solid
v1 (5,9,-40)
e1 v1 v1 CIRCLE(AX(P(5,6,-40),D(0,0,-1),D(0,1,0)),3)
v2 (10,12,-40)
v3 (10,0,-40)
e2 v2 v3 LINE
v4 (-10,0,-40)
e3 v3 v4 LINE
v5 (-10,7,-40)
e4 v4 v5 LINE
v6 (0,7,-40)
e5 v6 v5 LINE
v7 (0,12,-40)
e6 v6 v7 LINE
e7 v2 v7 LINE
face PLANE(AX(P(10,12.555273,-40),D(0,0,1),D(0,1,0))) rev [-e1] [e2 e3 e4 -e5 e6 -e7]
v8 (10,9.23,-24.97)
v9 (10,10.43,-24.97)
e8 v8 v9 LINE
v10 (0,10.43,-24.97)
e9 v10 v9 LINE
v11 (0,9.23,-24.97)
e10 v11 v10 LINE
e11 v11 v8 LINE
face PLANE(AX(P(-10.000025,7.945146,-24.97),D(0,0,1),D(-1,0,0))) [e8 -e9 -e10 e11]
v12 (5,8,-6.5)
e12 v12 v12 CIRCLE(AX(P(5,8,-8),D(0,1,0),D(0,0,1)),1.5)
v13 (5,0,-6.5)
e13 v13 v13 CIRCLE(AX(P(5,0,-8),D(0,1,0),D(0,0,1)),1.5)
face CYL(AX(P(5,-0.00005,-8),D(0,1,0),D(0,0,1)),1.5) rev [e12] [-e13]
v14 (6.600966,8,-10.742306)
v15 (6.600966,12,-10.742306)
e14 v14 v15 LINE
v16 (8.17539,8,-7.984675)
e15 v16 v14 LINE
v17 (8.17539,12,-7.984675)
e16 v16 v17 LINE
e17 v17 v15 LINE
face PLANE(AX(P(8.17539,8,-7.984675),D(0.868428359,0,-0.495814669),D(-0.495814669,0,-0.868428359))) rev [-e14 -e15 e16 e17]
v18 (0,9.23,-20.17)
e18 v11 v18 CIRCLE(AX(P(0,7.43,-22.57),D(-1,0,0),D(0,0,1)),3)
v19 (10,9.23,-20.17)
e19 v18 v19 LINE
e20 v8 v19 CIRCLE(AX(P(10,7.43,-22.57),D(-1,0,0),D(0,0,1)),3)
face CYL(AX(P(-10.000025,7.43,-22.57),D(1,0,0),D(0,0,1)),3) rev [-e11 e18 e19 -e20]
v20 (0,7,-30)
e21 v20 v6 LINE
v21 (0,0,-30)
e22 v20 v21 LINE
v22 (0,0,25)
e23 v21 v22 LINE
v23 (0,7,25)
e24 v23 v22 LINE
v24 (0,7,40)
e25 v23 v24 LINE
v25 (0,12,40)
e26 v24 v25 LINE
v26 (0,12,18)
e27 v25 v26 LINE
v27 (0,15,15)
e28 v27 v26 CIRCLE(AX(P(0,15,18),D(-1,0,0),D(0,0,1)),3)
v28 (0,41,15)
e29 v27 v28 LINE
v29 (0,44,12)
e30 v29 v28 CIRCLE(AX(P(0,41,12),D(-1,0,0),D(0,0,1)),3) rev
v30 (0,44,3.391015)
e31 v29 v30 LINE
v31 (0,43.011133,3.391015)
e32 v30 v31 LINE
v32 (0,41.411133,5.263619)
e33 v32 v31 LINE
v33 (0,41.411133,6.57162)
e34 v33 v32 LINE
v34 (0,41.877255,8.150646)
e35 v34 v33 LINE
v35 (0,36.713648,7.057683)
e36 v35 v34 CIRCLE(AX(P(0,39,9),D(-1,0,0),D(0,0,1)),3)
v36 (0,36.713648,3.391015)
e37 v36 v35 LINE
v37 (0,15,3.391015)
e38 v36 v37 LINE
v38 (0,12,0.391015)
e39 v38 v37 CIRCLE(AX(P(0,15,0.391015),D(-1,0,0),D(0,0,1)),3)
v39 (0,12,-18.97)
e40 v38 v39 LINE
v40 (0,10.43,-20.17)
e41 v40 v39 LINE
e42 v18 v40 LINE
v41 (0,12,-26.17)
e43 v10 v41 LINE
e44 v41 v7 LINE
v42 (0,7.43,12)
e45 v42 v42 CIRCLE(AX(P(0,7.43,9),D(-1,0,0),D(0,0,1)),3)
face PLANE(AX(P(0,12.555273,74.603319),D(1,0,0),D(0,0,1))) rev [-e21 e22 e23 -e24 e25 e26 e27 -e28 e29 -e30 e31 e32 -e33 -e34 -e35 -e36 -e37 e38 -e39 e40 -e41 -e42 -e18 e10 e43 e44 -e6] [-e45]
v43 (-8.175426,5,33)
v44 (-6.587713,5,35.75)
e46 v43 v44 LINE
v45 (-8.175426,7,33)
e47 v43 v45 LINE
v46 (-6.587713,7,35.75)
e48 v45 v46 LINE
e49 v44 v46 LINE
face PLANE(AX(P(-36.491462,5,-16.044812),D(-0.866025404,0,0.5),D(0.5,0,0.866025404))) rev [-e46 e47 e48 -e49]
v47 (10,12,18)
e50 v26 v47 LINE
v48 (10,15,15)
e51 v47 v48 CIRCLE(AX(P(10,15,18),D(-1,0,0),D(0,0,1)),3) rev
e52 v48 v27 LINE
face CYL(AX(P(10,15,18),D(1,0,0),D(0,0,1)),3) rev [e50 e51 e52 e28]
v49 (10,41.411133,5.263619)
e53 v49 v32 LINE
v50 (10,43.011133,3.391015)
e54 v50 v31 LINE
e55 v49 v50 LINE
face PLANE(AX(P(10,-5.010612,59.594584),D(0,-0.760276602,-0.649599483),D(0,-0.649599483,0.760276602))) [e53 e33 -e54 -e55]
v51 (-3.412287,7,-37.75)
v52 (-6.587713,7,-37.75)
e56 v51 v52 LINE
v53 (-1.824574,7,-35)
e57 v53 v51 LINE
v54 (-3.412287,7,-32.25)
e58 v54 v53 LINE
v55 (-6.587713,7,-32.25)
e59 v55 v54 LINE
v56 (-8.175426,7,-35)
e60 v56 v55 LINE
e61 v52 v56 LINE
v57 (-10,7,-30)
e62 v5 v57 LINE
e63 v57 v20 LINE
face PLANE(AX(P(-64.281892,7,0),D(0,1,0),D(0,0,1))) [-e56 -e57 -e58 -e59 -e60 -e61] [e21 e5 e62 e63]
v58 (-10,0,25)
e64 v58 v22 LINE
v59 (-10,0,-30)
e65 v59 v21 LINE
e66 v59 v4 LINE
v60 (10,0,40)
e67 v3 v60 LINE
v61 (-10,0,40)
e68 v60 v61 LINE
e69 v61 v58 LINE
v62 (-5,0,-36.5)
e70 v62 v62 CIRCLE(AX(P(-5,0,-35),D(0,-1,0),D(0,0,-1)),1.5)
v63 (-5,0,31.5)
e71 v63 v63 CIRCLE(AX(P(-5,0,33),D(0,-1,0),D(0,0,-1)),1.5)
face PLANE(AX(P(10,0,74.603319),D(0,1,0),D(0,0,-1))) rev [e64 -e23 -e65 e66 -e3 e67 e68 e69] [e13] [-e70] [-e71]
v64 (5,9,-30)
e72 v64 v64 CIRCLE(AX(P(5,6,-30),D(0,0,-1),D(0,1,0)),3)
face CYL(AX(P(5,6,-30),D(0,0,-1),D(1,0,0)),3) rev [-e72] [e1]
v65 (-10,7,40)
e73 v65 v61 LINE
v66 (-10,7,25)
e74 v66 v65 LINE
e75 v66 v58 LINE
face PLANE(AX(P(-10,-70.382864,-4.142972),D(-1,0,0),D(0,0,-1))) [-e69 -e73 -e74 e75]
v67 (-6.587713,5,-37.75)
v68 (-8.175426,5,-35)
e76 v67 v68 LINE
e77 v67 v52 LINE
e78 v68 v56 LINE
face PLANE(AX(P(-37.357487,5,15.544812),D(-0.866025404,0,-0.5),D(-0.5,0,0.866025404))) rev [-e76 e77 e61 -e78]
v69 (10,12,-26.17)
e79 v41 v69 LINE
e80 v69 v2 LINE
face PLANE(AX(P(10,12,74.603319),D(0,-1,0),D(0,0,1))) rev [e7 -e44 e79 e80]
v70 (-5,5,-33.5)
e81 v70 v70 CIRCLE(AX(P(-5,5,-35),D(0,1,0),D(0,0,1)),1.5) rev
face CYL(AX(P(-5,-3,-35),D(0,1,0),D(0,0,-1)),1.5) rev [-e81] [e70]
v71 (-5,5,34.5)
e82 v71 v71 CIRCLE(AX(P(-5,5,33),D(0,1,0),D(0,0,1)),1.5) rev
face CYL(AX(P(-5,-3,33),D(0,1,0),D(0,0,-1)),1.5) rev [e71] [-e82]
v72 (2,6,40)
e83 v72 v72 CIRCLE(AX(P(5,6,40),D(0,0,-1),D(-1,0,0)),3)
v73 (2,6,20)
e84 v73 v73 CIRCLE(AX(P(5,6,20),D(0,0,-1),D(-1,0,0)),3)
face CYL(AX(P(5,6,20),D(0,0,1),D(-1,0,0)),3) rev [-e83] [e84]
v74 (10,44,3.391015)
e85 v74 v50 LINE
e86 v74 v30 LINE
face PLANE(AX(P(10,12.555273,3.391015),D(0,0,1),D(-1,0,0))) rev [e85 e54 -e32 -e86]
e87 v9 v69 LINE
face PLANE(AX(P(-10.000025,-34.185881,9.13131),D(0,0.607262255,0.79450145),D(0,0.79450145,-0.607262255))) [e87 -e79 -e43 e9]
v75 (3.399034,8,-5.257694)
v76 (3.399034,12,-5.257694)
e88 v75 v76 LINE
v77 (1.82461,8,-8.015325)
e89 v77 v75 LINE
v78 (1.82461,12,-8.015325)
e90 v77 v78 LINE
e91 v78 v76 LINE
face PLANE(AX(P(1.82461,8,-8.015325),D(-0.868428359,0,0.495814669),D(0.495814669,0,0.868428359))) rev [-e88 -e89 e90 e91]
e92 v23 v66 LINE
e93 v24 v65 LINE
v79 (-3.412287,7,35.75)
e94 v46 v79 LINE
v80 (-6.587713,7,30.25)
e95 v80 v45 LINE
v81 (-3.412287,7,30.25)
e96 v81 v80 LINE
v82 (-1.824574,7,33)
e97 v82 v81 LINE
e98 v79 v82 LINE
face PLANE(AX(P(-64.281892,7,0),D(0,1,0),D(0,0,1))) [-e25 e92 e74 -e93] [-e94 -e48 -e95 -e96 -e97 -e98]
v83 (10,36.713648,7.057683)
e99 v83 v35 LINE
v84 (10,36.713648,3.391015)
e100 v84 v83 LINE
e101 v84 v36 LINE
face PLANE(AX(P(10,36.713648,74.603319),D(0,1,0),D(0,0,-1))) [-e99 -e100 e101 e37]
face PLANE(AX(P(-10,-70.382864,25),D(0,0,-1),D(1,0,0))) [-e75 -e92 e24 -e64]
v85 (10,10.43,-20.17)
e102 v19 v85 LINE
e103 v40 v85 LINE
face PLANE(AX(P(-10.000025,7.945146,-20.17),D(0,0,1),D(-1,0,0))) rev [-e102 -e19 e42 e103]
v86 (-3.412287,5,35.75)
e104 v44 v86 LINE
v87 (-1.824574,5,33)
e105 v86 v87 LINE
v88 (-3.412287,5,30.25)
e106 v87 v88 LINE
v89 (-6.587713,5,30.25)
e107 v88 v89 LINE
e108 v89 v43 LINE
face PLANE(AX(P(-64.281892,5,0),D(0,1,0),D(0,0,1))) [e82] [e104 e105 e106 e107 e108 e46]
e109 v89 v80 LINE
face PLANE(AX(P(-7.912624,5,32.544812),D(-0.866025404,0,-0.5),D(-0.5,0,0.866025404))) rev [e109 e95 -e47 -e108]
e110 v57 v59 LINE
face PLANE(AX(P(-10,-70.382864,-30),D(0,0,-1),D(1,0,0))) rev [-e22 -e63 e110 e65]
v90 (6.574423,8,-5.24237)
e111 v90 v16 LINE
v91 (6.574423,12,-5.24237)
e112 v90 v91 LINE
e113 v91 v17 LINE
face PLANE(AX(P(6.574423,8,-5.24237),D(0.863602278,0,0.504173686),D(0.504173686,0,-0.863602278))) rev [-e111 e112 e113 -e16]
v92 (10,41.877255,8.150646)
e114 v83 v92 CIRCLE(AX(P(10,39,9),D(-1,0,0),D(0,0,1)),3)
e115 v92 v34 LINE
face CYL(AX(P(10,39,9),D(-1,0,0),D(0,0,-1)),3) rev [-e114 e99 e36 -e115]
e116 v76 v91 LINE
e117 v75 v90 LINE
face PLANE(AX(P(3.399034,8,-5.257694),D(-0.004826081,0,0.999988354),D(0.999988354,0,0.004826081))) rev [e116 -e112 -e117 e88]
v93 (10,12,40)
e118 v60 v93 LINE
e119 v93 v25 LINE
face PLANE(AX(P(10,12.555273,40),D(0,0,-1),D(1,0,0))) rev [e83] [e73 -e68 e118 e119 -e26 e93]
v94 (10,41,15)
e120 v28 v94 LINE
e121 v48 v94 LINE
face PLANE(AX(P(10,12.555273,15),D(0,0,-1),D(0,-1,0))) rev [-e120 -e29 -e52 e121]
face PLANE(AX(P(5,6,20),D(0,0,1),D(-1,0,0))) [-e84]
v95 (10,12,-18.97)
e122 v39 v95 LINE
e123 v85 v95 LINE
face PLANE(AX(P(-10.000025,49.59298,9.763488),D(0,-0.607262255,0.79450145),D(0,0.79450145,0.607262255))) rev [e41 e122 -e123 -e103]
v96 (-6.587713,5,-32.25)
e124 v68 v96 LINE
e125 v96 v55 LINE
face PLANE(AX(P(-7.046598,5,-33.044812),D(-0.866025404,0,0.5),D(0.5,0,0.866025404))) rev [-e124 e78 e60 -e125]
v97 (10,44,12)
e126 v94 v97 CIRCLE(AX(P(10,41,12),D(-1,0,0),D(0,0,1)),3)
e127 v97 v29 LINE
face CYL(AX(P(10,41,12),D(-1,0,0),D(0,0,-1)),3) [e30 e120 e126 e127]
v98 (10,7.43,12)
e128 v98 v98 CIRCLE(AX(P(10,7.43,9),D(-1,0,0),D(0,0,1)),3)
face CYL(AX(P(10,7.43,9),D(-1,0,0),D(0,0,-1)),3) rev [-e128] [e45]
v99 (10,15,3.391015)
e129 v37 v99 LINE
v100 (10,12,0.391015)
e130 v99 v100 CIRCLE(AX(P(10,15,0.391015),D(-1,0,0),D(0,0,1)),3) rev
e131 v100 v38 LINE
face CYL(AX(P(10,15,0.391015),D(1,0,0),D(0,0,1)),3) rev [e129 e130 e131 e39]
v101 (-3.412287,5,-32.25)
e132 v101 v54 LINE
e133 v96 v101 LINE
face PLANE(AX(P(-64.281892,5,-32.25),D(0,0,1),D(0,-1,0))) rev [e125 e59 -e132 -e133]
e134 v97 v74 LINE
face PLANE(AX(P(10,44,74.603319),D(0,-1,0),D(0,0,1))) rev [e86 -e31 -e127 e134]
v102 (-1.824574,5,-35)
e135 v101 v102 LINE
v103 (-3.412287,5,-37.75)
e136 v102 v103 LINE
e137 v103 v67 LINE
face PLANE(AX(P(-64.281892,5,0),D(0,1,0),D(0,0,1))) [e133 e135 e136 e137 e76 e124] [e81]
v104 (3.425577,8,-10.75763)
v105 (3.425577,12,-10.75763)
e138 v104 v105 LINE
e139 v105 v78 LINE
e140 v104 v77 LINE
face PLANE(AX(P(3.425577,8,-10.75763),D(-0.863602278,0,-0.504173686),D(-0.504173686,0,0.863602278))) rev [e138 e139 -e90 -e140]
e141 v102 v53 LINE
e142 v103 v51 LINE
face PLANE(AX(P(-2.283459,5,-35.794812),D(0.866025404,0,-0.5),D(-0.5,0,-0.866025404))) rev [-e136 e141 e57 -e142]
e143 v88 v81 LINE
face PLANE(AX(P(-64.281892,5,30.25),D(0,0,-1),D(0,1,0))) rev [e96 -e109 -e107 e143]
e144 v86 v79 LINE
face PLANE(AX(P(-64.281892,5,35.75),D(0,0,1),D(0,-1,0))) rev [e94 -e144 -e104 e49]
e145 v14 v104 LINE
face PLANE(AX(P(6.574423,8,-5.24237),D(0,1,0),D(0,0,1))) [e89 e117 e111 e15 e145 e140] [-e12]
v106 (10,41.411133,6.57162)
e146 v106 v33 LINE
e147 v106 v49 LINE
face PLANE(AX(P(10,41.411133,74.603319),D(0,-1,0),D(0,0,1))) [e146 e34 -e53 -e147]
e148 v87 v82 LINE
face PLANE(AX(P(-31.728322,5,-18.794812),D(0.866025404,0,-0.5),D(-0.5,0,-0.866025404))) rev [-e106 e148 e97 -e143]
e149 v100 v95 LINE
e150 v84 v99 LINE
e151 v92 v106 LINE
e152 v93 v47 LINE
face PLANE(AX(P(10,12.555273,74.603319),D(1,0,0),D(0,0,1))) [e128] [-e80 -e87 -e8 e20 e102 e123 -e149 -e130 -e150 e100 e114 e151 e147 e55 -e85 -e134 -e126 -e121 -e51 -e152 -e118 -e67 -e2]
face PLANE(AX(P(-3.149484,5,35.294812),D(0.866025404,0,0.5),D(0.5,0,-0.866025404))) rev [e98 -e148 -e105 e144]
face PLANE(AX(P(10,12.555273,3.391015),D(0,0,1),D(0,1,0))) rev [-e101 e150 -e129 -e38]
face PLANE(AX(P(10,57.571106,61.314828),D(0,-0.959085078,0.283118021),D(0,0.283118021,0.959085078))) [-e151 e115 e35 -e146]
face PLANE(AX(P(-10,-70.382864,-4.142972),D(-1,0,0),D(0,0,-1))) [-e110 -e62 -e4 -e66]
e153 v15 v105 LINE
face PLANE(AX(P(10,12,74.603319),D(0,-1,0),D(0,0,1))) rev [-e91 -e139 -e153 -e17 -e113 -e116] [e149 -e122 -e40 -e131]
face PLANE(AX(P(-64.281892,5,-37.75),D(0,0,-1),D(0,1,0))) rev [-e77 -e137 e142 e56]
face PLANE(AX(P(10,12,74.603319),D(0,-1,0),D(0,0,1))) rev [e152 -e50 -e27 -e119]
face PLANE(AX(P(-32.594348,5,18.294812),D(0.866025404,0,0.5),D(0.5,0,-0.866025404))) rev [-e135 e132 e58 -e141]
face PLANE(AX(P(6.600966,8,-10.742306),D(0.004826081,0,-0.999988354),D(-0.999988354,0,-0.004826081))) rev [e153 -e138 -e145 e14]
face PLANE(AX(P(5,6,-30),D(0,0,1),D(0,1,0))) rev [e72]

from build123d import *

# Parameters (mm, degrees)
ESBO_O1_R                          = 3
RESSALTO_EXTRUS_O1_DEPTH           = 10
ESBO_O2_R                          = 3
CORTE_EXTRUS_O1_DEPTH              = 20
CORTE_EXTRUS_O2_START              = -70
ESBO_O2_2_R                        = 3
CORTE_EXTRUS_O2_DEPTH              = 10
FILETE1_R                          = 3
ESBO_O3_W                          = 15
ESBO_O3_H                          = 12
ESBO_O3_W_2                        = 10
RESSALTO_EXTRUS_O2_DEPTH           = 10
ESBO_O4_R                          = 1.5
CORTE_EXTRUS_O3_DEPTH              = 15
PADR_O_LINEAR1_COUNT               = 2
PADR_O_LINEAR1_PITCH               = 68
ESBO_O5_R                          = 3
CORTE_EXTRUS_O4_DEPTH              = 63.737548565
CORPO_MOVER_COPIAR1_OUTLINE_R      = 3
CORPO_MOVER_COPIAR1_DEPTH          = 10
CORPO_MOVER_COPIAR1_START          = -10
CORPO_MOVER_COPIAR1_2_OUTLINE_W    = 12
CORPO_MOVER_COPIAR1_2_OUTLINE_H    = 5
CORPO_MOVER_COPIAR1_2_DEPTH        = 11.9999999
CORPO_MOVER_COPIAR1_START_2        = 7.999555429
CORPO_MOVER_COPIAR1_3_DEPTH        = 2.000444571
CORPO_MOVER_COPIAR1_4_DEPTH        = 1.9999999
CORPO_MOVER_COPIAR1_START_3        = -15
CORPO_MOVER_COPIAR1_5_OUTLINE_W    = 10
CORPO_MOVER_COPIAR1_5_OUTLINE_H    = 12
CORPO_MOVER_COPIAR1_5_DEPTH        = 11.608984939
CORPO_MOVER_COPIAR1_START_4        = 15
CORPO_MOVER_COPIAR1_6_OUTLINE_W    = 10
CORPO_MOVER_COPIAR1_6_OUTLINE_H    = 12
CORPO_MOVER_COPIAR1_6_OUTLINE_R    = 3
CORPO_MOVER_COPIAR1_6_DEPTH        = 11.17
CORPO_MOVER_COPIAR1_START_5        = 25
CORPO_MOVER_COPIAR1_7_OUTLINE_W    = 10
CORPO_MOVER_COPIAR1_7_OUTLINE_H    = 12
CORPO_MOVER_COPIAR1_7_DEPTH        = 5
CORPO_MOVER_COPIAR1_START_6        = -30
CORPO_MOVER_COPIAR1_8_OUTLINE_R    = 3
CORPO_MOVER_COPIAR1_8_DEPTH        = 3.5411
CORPO_MOVER_COPIAR1_START_7        = 19.57
CORPO_MOVER_COPIAR1_9_OUTLINE_R    = 3
CORPO_MOVER_COPIAR1_9_DEPTH        = 0.43
CORPO_MOVER_COPIAR1_10_OUTLINE_W   = 10
CORPO_MOVER_COPIAR1_10_OUTLINE_H   = 5
CORPO_MOVER_COPIAR1_10_DEPTH       = 12
CORPO_MOVER_COPIAR1_11_OUTLINE_R   = 3
CORPO_MOVER_COPIAR1_11_DEPTH       = 20
CORPO_MOVER_COPIAR1_12_DEPTH       = 10
CORPO_MOVER_COPIAR1_13_OUTLINE_W   = 10
CORPO_MOVER_COPIAR1_13_OUTLINE_H   = 12
CORPO_MOVER_COPIAR1_13_OUTLINE_H_2 = 32
CORPO_MOVER_COPIAR1_13_DEPTH       = 26.608984939
CORPO_MOVER_COPIAR1_START_8        = 20
CORPO_MOVER_COPIAR1_14_OUTLINE_R   = 3
CORPO_MOVER_COPIAR1_14_DEPTH       = 10
CORPO_MOVER_COPIAR1_15_OUTLINE_W   = 10
CORPO_MOVER_COPIAR1_15_OUTLINE_H   = 5
CORPO_MOVER_COPIAR1_15_DEPTH       = 12
CORTE_EXTRUS_O5_START              = -5
ESBO_O6_W                          = 10
ESBO_O6_H                          = 15
ESBO_O6_H_2                        = 10
ESBO_O6_R                          = 1.5
CORTE_EXTRUS_O5_DEPTH              = 5
CORTE_EXTRUS_O6_START              = -7
ESBO_O6_3_R                        = 1.5
CORTE_EXTRUS_O6_DEPTH              = 7
ESBO_O7_R                          = 1.5
CORTE_EXTRUS_O7_DEPTH              = 53.191953422
ESBO_O7_3_R                        = 1.5
CORTE_EXTRUS_O8_DEPTH              = 4


# Read off the part's stored shape, not the designer's step: Corpo-Mover/Copiar1
with BuildPart() as part:
    # Esboço1 → Ressalto-extrusão1 (new body)
    with BuildSketch(Plane(origin=(0, 0, 0), x_dir=(0, 0, -1), z_dir=(1, 0, 0))):
        with BuildLine():
            Line((15, 44), (3.391015061, 44))
            Line((3.391015061, 44), (3.391015061, 43.011133206))
            Line((3.391015061, 43.011133206), (5.263619021, 41.411133206))
            Line((5.263619021, 41.411133206), (6.571620064, 41.411133206))
            Line((6.571620064, 41.411133206), (8.150645936, 41.877255233))
            ThreePointArc((8.150645936, 41.877255233), (11.934972998, 38.378764538), (7.057683257, 36.713647956))
            Line((7.057683257, 36.713647956), (3.391015061, 36.713647956))
            Line((3.391015061, 36.713647956), (3.391015061, 12))
            Line((3.391015061, 12), (-40, 12))
            Line((-40, 12), (-40, 0))
            Line((-40, 0), (40, 0))
            Line((40, 0), (40, 12))
            Line((40, 12), (15, 12))
            Line((15, 12), (15, 44))
        make_face()
        with Locations((9, 7.43)):
            Circle(ESBO_O1_R, mode=Mode.SUBTRACT)
    extrude(amount=RESSALTO_EXTRUS_O1_DEPTH)

    # Esboço2 → Corte-extrusão1 (cut)
    with BuildSketch(Plane(origin=(0, 0, -40), x_dir=(-1, 0, 0), z_dir=(0, 0, -1))):
        with Locations((-5, 6)):
            Circle(ESBO_O2_R)
    extrude(amount=-CORTE_EXTRUS_O1_DEPTH, mode=Mode.SUBTRACT)

    # Esboço2<2> → Corte-extrusão2 (cut)
    with BuildSketch(Plane(origin=(0, 0, -40), x_dir=(-1, 0, 0), z_dir=(0, 0, -1)).offset(CORTE_EXTRUS_O2_START)):
        with Locations((-5, 6)):
            Circle(ESBO_O2_2_R)
    extrude(amount=-CORTE_EXTRUS_O2_DEPTH, mode=Mode.SUBTRACT)

    # Filete1
    filete1_edges = [part.edges().sort_by_distance(p)[0] for p in [
        (5, 12, -3.391015061),
        (5, 44, -15),
        (5, 12, -15),
    ]]
    fillet(filete1_edges, radius=FILETE1_R)

    # Esboço3 → Ressalto-extrusão2 (add)
    with BuildSketch(Plane.ZY):
        with Locations((-32.5, 6)):
            Rectangle(ESBO_O3_W, ESBO_O3_H)
        with Locations((35, 6)):
            Rectangle(ESBO_O3_W_2, ESBO_O3_H)
    extrude(amount=RESSALTO_EXTRUS_O2_DEPTH)

    # Esboço4 → Corte-extrusão3 (cut)
    with BuildSketch(Plane(origin=(0, 12, 0), x_dir=(1, 0, 0), z_dir=(0, 1, 0))):
        with Locations(Location((-5, 33, 0), (0, 0, 270))):
            Circle(ESBO_O4_R)
    corte_extrus_o3 = extrude(amount=-CORTE_EXTRUS_O3_DEPTH, mode=Mode.SUBTRACT)

    # Padrão linear1: Corte-extrusão3 ×2
    with Locations(*[(0, 0, i * PADR_O_LINEAR1_PITCH) for i in range(1, PADR_O_LINEAR1_COUNT)]):
        add(corte_extrus_o3, mode=Mode.SUBTRACT)

    # Esboço5 → Corte-extrusão4 (cut, through all)
    with BuildSketch(Plane(origin=(10, 0, 0), x_dir=(0, 0, -1), z_dir=(1, 0, 0))):
        with Locations((-22.57, 7.43)):
            Circle(ESBO_O5_R)
        with BuildLine():
            Line((-18.97, 12), (-26.17, 12))
            Line((-26.17, 12), (-24.97, 10.43))
            Line((-24.97, 10.43), (-24.97, 9.23))
            ThreePointArc((-24.97, 9.23), (-22.57, 10.43), (-20.17, 9.23))
            Line((-20.17, 9.23), (-20.17, 10.43))
            Line((-20.17, 10.43), (-18.97, 12))
        make_face()
    extrude(amount=-CORTE_EXTRUS_O4_DEPTH, mode=Mode.SUBTRACT)

    # Corpo-Mover/Copiar1 outline → Corpo-Mover/Copiar1 (add)
    # profile 1 of 2: a face of its own
    with BuildSketch(Plane.YZ):
        with BuildLine():
            ThreePointArc((15, 15), (12.878679656, 15.878679656), (12, 18))
            Line((12, 18), (12, 18.97))
            Line((12, 18.97), (10.43, 20.17))
            Line((10.43, 20.17), (9.23, 20.17))
            ThreePointArc((9.23, 20.17), (5.014914218, 20.790291972), (5.670710371, 25))
            Line((5.670710371, 25), (0, 25))
            Line((0, 25), (0, -30))
            Line((0, -30), (12, -30))
            Line((12, -30), (12, -26.17))
            Line((12, -26.17), (10.46925, -25))
            Line((10.46925, -25), (9.189289629, -25))
            ThreePointArc((9.189289629, -25), (4.927760612, -24.224931432), (5.882388938, -20))
            ThreePointArc((5.882388938, -20), (7.43, -19.57), (8.977611062, -20))
            ThreePointArc((8.977611062, -20), (9.105962397, -20.081797829), (9.23, -20.17))
            Line((9.23, -20.17), (10.43, -20.17))
            Line((10.43, -20.17), (12, -18.97))
            Line((12, -18.97), (12, 0.391015061))
            ThreePointArc((12, 0.391015061), (12.878679656, 2.512335405), (15, 3.391015061))
            Line((15, 3.391015061), (36.713647956, 3.391015061))
            Line((36.713647956, 3.391015061), (36.713647956, 7.057683257))
            ThreePointArc((36.713647956, 7.057683257), (38.378764539, 11.934972998), (41.877255233, 8.150645936))
            Line((41.877255233, 8.150645936), (41.411133206, 6.571620064))
            Line((41.411133206, 6.571620064), (41.411133206, 5.263619021))
            Line((41.411133206, 5.263619021), (43.011133206, 3.391015061))
            Line((43.011133206, 3.391015061), (44, 3.391015061))
            Line((44, 3.391015061), (44, 12))
            ThreePointArc((44, 12), (43.121320344, 14.121320344), (41, 15))
            Line((41, 15), (15, 15))
        make_face()
        with Locations((7.43, 9)):
            Circle(CORPO_MOVER_COPIAR1_OUTLINE_R, mode=Mode.SUBTRACT)
    # profile 2 of 2: a face of its own
    with BuildSketch(Plane.YZ):
        Polygon((10.46925, 25), (12, 25), (12, 26.17), align=None)
    extrude(amount=CORPO_MOVER_COPIAR1_DEPTH)

    # Corpo-Mover_Copiar1 2 outline → Corpo-Mover_Copiar1 2 (add)
    with BuildSketch(Plane.YZ.offset(CORPO_MOVER_COPIAR1_START)):
        with Locations((6, 27.5)):
            Rectangle(CORPO_MOVER_COPIAR1_2_OUTLINE_W, CORPO_MOVER_COPIAR1_2_OUTLINE_H)
    extrude(amount=CORPO_MOVER_COPIAR1_2_DEPTH)

    # Corpo-Mover_Copiar1 3 outline → Corpo-Mover_Copiar1 3 (add)
    with BuildSketch(Plane.YZ.offset(CORPO_MOVER_COPIAR1_START_2)):
        with BuildLine():
            Line((10.43, 20.17), (12, 18.97))
            Line((12, 18.97), (12, 25))
            Line((12, 25), (10.46925, 25))
            Line((10.46925, 25), (10.43, 24.97))
            Line((10.43, 24.97), (9.23, 24.97))
            ThreePointArc((9.23, 24.97), (4.43, 22.57), (9.23, 20.17))
            Line((9.23, 20.17), (10.43, 20.17))
        make_face()
    extrude(amount=CORPO_MOVER_COPIAR1_3_DEPTH)

    # Corpo-Mover_Copiar1 4 outline → Corpo-Mover_Copiar1 4 (add)
    with BuildSketch(Plane.YZ):
        with BuildLine():
            Line((10.43, 20.17), (12, 18.97))
            Line((12, 18.97), (12, 25))
            Line((12, 25), (10.46925, 25))
            Line((10.46925, 25), (10.43, 24.97))
            Line((10.43, 24.97), (9.23, 24.97))
            ThreePointArc((9.23, 24.97), (9.209708028, 24.985085782), (9.189289629, 25))
            Line((9.189289629, 25), (5.670710371, 25))
            ThreePointArc((5.670710371, 25), (5.014914218, 20.790291972), (9.23, 20.17))
            Line((9.23, 20.17), (10.43, 20.17))
        make_face()
    extrude(amount=CORPO_MOVER_COPIAR1_4_DEPTH)

    # Corpo-Mover_Copiar1 5 outline → Corpo-Mover_Copiar1 5 (add)
    with BuildSketch(Plane.XY.offset(CORPO_MOVER_COPIAR1_START_3)):
        with Locations((5, 6)):
            Rectangle(CORPO_MOVER_COPIAR1_5_OUTLINE_W, CORPO_MOVER_COPIAR1_5_OUTLINE_H)
    extrude(amount=CORPO_MOVER_COPIAR1_5_DEPTH)

    # Corpo-Mover_Copiar1 6 outline → Corpo-Mover_Copiar1 6 (add)
    with BuildSketch(Plane.XY.offset(CORPO_MOVER_COPIAR1_START_4)):
        with Locations((5, 6)):
            Rectangle(CORPO_MOVER_COPIAR1_6_OUTLINE_W, CORPO_MOVER_COPIAR1_6_OUTLINE_H)
        with Locations((5, 6)):
            Circle(CORPO_MOVER_COPIAR1_6_OUTLINE_R, mode=Mode.SUBTRACT)
    extrude(amount=CORPO_MOVER_COPIAR1_6_DEPTH)

    # Corpo-Mover_Copiar1 7 outline → Corpo-Mover_Copiar1 7 (add)
    with BuildSketch(Plane.XY.offset(CORPO_MOVER_COPIAR1_START_5)):
        with Locations((-5, 6)):
            Rectangle(CORPO_MOVER_COPIAR1_7_OUTLINE_W, CORPO_MOVER_COPIAR1_7_OUTLINE_H)
    extrude(amount=CORPO_MOVER_COPIAR1_7_DEPTH)

    # Corpo-Mover_Copiar1 8 outline → Corpo-Mover_Copiar1 8 (add)
    with BuildSketch(Plane.XY.offset(CORPO_MOVER_COPIAR1_START_6)):
        with Locations((5, 6)):
            Circle(CORPO_MOVER_COPIAR1_8_OUTLINE_R)
    extrude(amount=CORPO_MOVER_COPIAR1_8_DEPTH)

    # Corpo-Mover_Copiar1 9 outline → Corpo-Mover_Copiar1 9 (add)
    with BuildSketch(Plane.XY.offset(CORPO_MOVER_COPIAR1_START_7)):
        with Locations((5, 6)):
            Circle(CORPO_MOVER_COPIAR1_9_OUTLINE_R)
    extrude(amount=CORPO_MOVER_COPIAR1_9_DEPTH)

    # Corpo-Mover_Copiar1 10 outline → Corpo-Mover_Copiar1 10 (add)
    with BuildSketch(Plane(origin=(0, 0, 0), x_dir=(1, 0, 0), z_dir=(0, 1, 0))):
        with BuildLine():
            ThreePointArc((-3.881966011, -34), (-5, -34.5), (-6.118033989, -34))
            ThreePointArc((-6.118033989, -34), (-5, -36.5), (-3.881966011, -34))
        make_face()
        with BuildLine():
            ThreePointArc((-3.881966011, 34), (-5, 33.5), (-6.118033989, 34))
            ThreePointArc((-6.118033989, 34), (-5, 31.5), (-3.881966011, 34))
        make_face()
        with Locations((-5, -27.5)):
            Rectangle(CORPO_MOVER_COPIAR1_10_OUTLINE_W, CORPO_MOVER_COPIAR1_10_OUTLINE_H)
    extrude(amount=CORPO_MOVER_COPIAR1_10_DEPTH)

    # Corpo-Mover_Copiar1 11 outline → Corpo-Mover_Copiar1 11 (cut)
    with BuildSketch(Plane.YZ.offset(CORPO_MOVER_COPIAR1_START)):
        with BuildLine():
            ThreePointArc((15, -3.391015061), (12.878679656, -2.512335405), (12, -0.391015061))
            Line((12, -0.391015061), (12, -18))
            ThreePointArc((12, -18), (12.878679656, -15.878679656), (15, -15))
            Line((15, -15), (41, -15))
            ThreePointArc((41, -15), (43.121320344, -14.121320344), (44, -12))
            Line((44, -12), (44, -3.391015061))
            Line((44, -3.391015061), (43.011133206, -3.391015061))
            Line((43.011133206, -3.391015061), (41.411133206, -5.263619021))
            Line((41.411133206, -5.263619021), (41.411133206, -6.571620064))
            Line((41.411133206, -6.571620064), (41.877255233, -8.150645936))
            ThreePointArc((41.877255233, -8.150645936), (38.378764539, -11.934972998), (36.713647956, -7.057683257))
            Line((36.713647956, -7.057683257), (36.713647956, -3.391015061))
            Line((36.713647956, -3.391015061), (15, -3.391015061))
        make_face()
        with BuildLine():
            Line((12, -18.97), (10.43, -20.17))
            Line((10.43, -20.17), (9.23, -20.17))
            ThreePointArc((9.23, -20.17), (4.43, -22.57), (9.23, -24.97))
            Line((9.23, -24.97), (10.43, -24.97))
            Line((10.43, -24.97), (12, -26.17))
            Line((12, -26.17), (12, -18.97))
        make_face()
        with Locations((7.43, 9)):
            Circle(CORPO_MOVER_COPIAR1_11_OUTLINE_R)
    extrude(amount=CORPO_MOVER_COPIAR1_11_DEPTH, mode=Mode.SUBTRACT)

    # Corpo-Mover_Copiar1 12 outline → Corpo-Mover_Copiar1 12 (cut)
    with BuildSketch(Plane.YZ.offset(CORPO_MOVER_COPIAR1_START)):
        with BuildLine():
            Line((12, -30), (12, -26.17))
            Line((12, -26.17), (10.46925, -25))
            Line((10.46925, -25), (9.189289629, -25))
            ThreePointArc((9.189289629, -25), (7.43, -25.57), (5.670710371, -25))
            Line((5.670710371, -25), (0, -25))
            Line((0, -25), (0, -30))
            Line((0, -30), (12, -30))
        make_face()
    extrude(amount=CORPO_MOVER_COPIAR1_12_DEPTH, mode=Mode.SUBTRACT)

    # Corpo-Mover_Copiar1 13 outline → Corpo-Mover_Copiar1 13 (cut)
    with BuildSketch(Plane.XY.offset(CORPO_MOVER_COPIAR1_START_6)):
        with Locations((-5, 6)):
            Rectangle(CORPO_MOVER_COPIAR1_13_OUTLINE_W, CORPO_MOVER_COPIAR1_13_OUTLINE_H)
        with Locations((5, 28)):
            Rectangle(CORPO_MOVER_COPIAR1_13_OUTLINE_W, CORPO_MOVER_COPIAR1_13_OUTLINE_H_2)
    extrude(amount=CORPO_MOVER_COPIAR1_13_DEPTH, mode=Mode.SUBTRACT)

    # Corpo-Mover_Copiar1 14 outline → Corpo-Mover_Copiar1 14 (cut)
    with BuildSketch(Plane.XY.offset(CORPO_MOVER_COPIAR1_START_8)):
        with Locations((5, 6)):
            Circle(CORPO_MOVER_COPIAR1_14_OUTLINE_R)
    extrude(amount=CORPO_MOVER_COPIAR1_14_DEPTH, mode=Mode.SUBTRACT)

    # Corpo-Mover_Copiar1 15 outline → Corpo-Mover_Copiar1 15 (cut)
    with BuildSketch(Plane(origin=(0, 0, 0), x_dir=(1, 0, 0), z_dir=(0, 1, 0))):
        with BuildLine():
            ThreePointArc((-3.881966011, -34), (-5, -31.5), (-6.118033989, -34))
            ThreePointArc((-6.118033989, -34), (-5, -33.5), (-3.881966011, -34))
        make_face()
        with BuildLine():
            ThreePointArc((-3.881966011, 34), (-5, 36.5), (-6.118033989, 34))
            ThreePointArc((-6.118033989, 34), (-5, 34.5), (-3.881966011, 34))
        make_face()
        with Locations((-5, 27.5)):
            Rectangle(CORPO_MOVER_COPIAR1_15_OUTLINE_W, CORPO_MOVER_COPIAR1_15_OUTLINE_H)
    extrude(amount=CORPO_MOVER_COPIAR1_15_DEPTH, mode=Mode.SUBTRACT)

    # Esboço6 → Corte-extrusão5 (cut)
    # profile 1 of 4: a face of its own
    with BuildSketch(Plane(origin=(0, 12, 0), x_dir=(1, 0, 0), z_dir=(0, 1, 0)).offset(CORTE_EXTRUS_O5_START)):
        with Locations((-5, -32.5)):
            Rectangle(ESBO_O6_W, ESBO_O6_H)
        Polygon((-6.58771324, -35.75), (-3.41228676, -35.75), (-1.824573519, -33), (-3.41228676, -30.25), (-6.58771324, -30.25), (-8.175426481, -33), align=None, mode=Mode.SUBTRACT)
    # profile 2 of 4: a face of its own
    with BuildSketch(Plane(origin=(0, 12, 0), x_dir=(1, 0, 0), z_dir=(0, 1, 0)).offset(CORTE_EXTRUS_O5_START)):
        Polygon((-8.175426481, -33), (-6.58771324, -35.75), (-3.41228676, -35.75), (-1.824573519, -33), (-3.41228676, -30.25), (-6.58771324, -30.25), align=None)
    # profile 3 of 4: a face of its own
    with BuildSketch(Plane(origin=(0, 12, 0), x_dir=(1, 0, 0), z_dir=(0, 1, 0)).offset(CORTE_EXTRUS_O5_START)):
        with Locations((-5, 35)):
            Rectangle(ESBO_O6_W, ESBO_O6_H_2)
        Polygon((-1.824573519, 35), (-3.41228676, 32.25), (-6.58771324, 32.25), (-8.175426481, 35), (-6.58771324, 37.75), (-3.41228676, 37.75), align=None, mode=Mode.SUBTRACT)
    # profile 4 of 4: a face of its own
    with BuildSketch(Plane(origin=(0, 12, 0), x_dir=(1, 0, 0), z_dir=(0, 1, 0)).offset(CORTE_EXTRUS_O5_START)):
        Polygon((-8.175426481, 35), (-6.58771324, 32.25), (-3.41228676, 32.25), (-1.824573519, 35), (-3.41228676, 37.75), (-6.58771324, 37.75), align=None)
        with Locations(Location((-5, 35, 0), (0, 0, 90))):
            Circle(ESBO_O6_R, mode=Mode.SUBTRACT)
    extrude(amount=CORTE_EXTRUS_O5_DEPTH, mode=Mode.SUBTRACT)

    # Esboço6<3> → Corte-extrusão6 (cut)
    # profile 1 of 2: a face of its own
    with BuildSketch(Plane(origin=(0, 12, 0), x_dir=(1, 0, 0), z_dir=(0, 1, 0)).offset(CORTE_EXTRUS_O6_START)):
        Polygon((-8.175426481, 35), (-6.58771324, 32.25), (-3.41228676, 32.25), (-1.824573519, 35), (-3.41228676, 37.75), (-6.58771324, 37.75), align=None)
        with Locations(Location((-5, 35, 0), (0, 0, 90))):
            Circle(ESBO_O6_3_R, mode=Mode.SUBTRACT)
    # profile 2 of 2: a face of its own
    with BuildSketch(Plane(origin=(0, 12, 0), x_dir=(1, 0, 0), z_dir=(0, 1, 0)).offset(CORTE_EXTRUS_O6_START)):
        Polygon((-8.175426481, -33), (-6.58771324, -35.75), (-3.41228676, -35.75), (-1.824573519, -33), (-3.41228676, -30.25), (-6.58771324, -30.25), align=None)
    extrude(amount=CORTE_EXTRUS_O6_DEPTH, mode=Mode.SUBTRACT)

    # Esboço7 → Corte-extrusão7 (cut, through all)
    with BuildSketch(Plane(origin=(0, 12, 0), x_dir=(1, 0, 0), z_dir=(0, 1, 0))):
        with Locations(Location((5, 8, 0), (0, 0, 270))):
            Circle(ESBO_O7_R)
    extrude(amount=-CORTE_EXTRUS_O7_DEPTH, mode=Mode.SUBTRACT)

    # Esboço7<3> → Corte-extrusão8 (cut)
    with BuildSketch(Plane(origin=(0, 12, 0), x_dir=(1, 0, 0), z_dir=(0, 1, 0))):
        Polygon((6.574423029, 5.242369593), (8.175389501, 7.984675136), (6.600966472, 10.742305542), (3.425576971, 10.757630407), (1.824610499, 8.015324864), (3.399033528, 5.257694458), align=None)
        with Locations(Location((5, 8, 0), (0, 0, 270))):
            Circle(ESBO_O7_3_R, mode=Mode.SUBTRACT)
    extrude(amount=-CORTE_EXTRUS_O8_DEPTH, mode=Mode.SUBTRACT)


solid = part.part
